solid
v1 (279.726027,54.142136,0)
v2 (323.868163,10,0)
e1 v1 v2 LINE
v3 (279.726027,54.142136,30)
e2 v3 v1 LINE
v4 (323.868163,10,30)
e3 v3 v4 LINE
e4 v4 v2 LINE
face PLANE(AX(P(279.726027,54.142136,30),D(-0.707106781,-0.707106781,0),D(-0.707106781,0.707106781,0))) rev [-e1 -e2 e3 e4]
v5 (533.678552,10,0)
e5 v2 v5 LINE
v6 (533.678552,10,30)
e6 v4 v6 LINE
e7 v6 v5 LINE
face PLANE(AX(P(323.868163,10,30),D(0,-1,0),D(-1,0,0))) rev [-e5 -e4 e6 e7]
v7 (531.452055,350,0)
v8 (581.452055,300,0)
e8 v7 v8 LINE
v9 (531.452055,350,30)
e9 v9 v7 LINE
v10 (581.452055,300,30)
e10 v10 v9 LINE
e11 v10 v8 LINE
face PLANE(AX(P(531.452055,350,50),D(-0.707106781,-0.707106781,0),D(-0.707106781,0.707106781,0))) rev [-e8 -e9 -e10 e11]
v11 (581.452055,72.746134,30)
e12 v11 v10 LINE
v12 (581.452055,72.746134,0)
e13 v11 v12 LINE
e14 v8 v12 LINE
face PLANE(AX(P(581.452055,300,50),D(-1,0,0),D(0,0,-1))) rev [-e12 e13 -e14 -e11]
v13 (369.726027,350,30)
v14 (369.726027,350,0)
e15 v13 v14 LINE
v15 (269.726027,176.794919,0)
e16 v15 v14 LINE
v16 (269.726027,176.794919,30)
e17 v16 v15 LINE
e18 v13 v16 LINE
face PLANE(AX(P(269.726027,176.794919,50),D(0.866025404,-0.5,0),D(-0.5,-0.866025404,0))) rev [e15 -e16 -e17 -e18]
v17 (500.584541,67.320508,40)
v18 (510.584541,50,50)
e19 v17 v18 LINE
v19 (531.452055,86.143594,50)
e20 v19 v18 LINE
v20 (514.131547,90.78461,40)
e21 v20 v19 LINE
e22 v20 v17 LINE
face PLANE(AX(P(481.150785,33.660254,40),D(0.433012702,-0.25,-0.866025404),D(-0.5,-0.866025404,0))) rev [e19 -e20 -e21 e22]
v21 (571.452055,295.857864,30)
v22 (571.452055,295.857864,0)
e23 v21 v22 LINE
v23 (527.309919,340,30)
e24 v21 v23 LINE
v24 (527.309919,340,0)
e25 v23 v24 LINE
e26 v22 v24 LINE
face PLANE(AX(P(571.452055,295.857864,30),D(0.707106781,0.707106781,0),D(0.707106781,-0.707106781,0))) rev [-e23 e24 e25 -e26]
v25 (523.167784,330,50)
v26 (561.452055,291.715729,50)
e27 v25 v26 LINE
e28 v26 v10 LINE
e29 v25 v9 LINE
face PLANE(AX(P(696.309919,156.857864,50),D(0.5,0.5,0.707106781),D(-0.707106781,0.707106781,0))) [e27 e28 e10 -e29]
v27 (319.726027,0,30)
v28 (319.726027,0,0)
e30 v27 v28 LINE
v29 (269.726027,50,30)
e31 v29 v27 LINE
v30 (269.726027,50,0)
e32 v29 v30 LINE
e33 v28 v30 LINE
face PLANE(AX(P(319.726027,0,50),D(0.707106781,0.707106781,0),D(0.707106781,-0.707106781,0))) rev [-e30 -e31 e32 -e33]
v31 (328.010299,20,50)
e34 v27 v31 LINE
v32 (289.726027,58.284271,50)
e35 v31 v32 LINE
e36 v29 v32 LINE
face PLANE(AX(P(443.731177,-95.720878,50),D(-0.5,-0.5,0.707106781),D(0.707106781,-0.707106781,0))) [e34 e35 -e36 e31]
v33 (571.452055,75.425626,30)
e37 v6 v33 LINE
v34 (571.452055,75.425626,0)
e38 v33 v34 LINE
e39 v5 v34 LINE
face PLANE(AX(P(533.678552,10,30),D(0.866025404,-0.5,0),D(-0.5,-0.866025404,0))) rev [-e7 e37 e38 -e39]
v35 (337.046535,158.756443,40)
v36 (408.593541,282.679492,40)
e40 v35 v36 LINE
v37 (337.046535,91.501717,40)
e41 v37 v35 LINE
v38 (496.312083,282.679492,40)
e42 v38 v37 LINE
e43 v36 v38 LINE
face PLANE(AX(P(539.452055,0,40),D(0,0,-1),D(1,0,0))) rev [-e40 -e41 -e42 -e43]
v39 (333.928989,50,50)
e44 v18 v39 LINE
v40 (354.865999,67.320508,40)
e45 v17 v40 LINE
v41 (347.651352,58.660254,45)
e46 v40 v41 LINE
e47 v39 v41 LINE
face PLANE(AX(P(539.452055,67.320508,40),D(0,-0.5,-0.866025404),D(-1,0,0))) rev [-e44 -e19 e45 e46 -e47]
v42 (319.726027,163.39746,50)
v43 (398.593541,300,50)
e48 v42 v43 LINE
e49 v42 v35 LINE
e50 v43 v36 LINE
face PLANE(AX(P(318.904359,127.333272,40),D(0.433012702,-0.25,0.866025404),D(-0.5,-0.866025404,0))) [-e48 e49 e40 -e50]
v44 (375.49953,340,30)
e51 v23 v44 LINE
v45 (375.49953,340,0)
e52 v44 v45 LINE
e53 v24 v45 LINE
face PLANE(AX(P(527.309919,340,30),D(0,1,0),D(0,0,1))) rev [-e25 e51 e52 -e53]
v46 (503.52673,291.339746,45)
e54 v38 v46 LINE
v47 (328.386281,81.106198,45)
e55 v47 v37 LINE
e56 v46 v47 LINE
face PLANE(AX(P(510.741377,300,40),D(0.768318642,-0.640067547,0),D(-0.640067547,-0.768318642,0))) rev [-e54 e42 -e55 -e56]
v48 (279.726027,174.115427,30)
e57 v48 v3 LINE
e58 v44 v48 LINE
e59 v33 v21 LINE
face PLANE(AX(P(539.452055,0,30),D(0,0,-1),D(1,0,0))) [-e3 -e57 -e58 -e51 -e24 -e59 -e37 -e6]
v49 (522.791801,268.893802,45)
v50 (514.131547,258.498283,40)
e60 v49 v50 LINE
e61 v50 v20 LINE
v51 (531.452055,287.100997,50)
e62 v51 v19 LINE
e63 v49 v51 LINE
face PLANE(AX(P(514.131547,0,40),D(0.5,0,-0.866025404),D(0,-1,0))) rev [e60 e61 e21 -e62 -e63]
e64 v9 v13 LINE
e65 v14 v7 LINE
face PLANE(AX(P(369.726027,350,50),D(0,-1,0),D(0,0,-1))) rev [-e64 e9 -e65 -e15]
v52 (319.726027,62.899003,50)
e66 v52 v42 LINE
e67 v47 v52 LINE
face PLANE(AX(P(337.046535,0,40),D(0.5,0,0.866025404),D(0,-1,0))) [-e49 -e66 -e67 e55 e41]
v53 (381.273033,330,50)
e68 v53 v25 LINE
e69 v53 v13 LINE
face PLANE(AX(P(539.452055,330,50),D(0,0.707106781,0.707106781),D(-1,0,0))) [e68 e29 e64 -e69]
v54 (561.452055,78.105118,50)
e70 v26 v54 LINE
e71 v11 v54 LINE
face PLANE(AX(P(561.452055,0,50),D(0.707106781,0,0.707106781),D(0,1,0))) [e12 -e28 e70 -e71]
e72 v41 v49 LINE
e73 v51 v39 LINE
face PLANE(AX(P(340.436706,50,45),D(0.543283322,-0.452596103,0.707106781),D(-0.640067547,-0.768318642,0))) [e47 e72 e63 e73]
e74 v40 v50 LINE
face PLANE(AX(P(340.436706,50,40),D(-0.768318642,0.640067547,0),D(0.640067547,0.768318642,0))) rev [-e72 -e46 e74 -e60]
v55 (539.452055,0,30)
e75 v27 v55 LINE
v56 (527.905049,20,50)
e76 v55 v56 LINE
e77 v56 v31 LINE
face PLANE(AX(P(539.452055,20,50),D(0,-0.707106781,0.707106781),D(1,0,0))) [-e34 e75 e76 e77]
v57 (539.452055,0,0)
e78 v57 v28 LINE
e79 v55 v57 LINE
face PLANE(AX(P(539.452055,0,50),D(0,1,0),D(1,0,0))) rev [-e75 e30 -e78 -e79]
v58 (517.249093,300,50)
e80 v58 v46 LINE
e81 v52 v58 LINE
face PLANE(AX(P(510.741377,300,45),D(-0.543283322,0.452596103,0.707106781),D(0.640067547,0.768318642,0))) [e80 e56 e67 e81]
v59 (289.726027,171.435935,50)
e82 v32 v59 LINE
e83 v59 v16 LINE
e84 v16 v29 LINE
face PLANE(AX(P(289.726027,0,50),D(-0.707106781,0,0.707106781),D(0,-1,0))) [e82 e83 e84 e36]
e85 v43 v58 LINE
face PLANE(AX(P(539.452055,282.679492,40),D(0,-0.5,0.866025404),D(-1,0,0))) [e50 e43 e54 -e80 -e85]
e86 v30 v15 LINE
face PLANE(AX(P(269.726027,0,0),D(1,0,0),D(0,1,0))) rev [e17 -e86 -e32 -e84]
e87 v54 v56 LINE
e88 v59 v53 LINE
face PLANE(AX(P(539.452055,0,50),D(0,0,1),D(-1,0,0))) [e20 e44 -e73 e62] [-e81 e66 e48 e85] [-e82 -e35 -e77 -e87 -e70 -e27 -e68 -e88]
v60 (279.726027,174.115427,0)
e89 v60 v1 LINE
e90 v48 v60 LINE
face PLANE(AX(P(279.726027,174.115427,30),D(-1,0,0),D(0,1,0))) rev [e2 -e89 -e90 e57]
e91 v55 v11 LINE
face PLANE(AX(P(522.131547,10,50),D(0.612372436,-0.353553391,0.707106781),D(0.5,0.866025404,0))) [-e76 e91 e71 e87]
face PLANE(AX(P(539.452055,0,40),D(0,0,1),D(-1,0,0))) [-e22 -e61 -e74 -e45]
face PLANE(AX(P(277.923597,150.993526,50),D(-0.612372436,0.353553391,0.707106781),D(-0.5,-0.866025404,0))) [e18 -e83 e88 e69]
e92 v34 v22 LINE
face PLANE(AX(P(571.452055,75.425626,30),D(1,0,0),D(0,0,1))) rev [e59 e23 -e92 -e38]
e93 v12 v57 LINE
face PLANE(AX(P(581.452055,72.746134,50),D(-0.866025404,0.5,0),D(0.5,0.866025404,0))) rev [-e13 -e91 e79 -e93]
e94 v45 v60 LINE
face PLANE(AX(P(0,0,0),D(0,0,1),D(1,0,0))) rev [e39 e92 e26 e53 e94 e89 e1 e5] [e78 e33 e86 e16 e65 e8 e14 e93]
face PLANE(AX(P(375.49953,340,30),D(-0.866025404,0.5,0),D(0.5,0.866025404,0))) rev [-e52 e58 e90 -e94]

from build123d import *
from OCP.BRepFilletAPI import BRepFilletAPI_MakeChamfer

# Parameters (mm, degrees)
BOSS_EXTRU_1_DEPTH      = 50
CHANFREIN1_SIZE         = 20
ENL_V_MAT_EXTRU_1_DEPTH = 10
CHANFREIN2_SIZE         = 10
CHANFREIN2_SIZE_2       = 17.320508076
CHANFREIN3_SIZE         = 5
ENL_V_MAT_EXTRU_2_DEPTH = 30
ESQUISSE4_W             = 311.726027397
ESQUISSE4_H             = 51.931996983
ENL_V_MAT_EXTRU_3_DEPTH = 681.504586336


# Some blends are built 0.0001 mm under size
with BuildPart() as part:
    # Esquisse1 → Boss.-Extru.1 (new body)
    with BuildSketch(Plane.XY):
        Polygon((0, 0), (219.726027397, 0), (269.726027397, 50), (269.726027397, 176.794919243), (169.726027397, 350), (8, 350), (-42, 300), (-42, 72.746133918), align=None)
    extrude(amount=BOSS_EXTRU_1_DEPTH)

    # Chanfrein1
    chanfrein1_edges = [part.edges().sort_by_distance(p)[0] for p in [
        (244.726027397, 25, 50),
        (269.726027397, 113.397459622, 50),
        (219.726027397, 263.397459622, 50),
        (88.863013699, 350, 50),
        (-17, 325, 50),
        (-42, 186.373066959, 50),
        (-21, 36.373066959, 50),
        (109.863013699, 0, 50),
    ]]
    chamfer(chanfrein1_edges, length=CHANFREIN1_SIZE)

    # Esquisse2 → Enlèv. mat.-Extru.1 (cut)
    with BuildSketch(Plane.XY.offset(50)):
        Polygon((28.710678119, 300), (219.726027397, 70.710678119), (219.726027397, 163.397459622), (140.858513938, 300), align=None)
        Polygon((199.015349279, 50), (8, 279.289321881), (8, 86.143593539), (28.867513459, 50), align=None)
    extrude(amount=-ENL_V_MAT_EXTRU_1_DEPTH, mode=Mode.SUBTRACT)

    # Chanfrein2
    chanfrein2_edges_1 = [part.edges().sort_by_distance(p)[0] for p in [
        (219.726027397, 117.05406887, 40),
    ]]
    chanfrein2_side_1 = [part.faces().sort_by_distance(p)[0] for p in [
        (219.726027397, 117.05406887, 40.2),
    ]]
    chanfrein2_edges_2 = [part.edges().sort_by_distance(p)[0] for p in [
        (180.292270668, 231.698729811, 40),
    ]]
    chanfrein2_side_2 = [part.faces().sort_by_distance(p)[0] for p in [
        (180.292270668, 231.698729811, 40.2),
    ]]
    chanfrein2_edges_3 = [part.edges().sort_by_distance(p)[0] for p in [
        (84.784596028, 300, 40),
    ]]
    chanfrein2_side_3 = [part.faces().sort_by_distance(p)[0] for p in [
        (84.784596028, 300, 40.2),
    ]]
    chanfrein2_edges_4 = [part.edges().sort_by_distance(p)[0] for p in [
        (113.941431369, 50, 40),
    ]]
    chanfrein2_side_4 = [part.faces().sort_by_distance(p)[0] for p in [
        (113.941431369, 50, 40.2),
    ]]
    chanfrein2_edges_5 = [part.edges().sort_by_distance(p)[0] for p in [
        (18.43375673, 68.07179677, 40),
    ]]
    chanfrein2_side_5 = [part.faces().sort_by_distance(p)[0] for p in [
        (18.43375673, 68.07179677, 40.2),
    ]]
    chanfrein2_edges_6 = [part.edges().sort_by_distance(p)[0] for p in [
        (8, 182.71645771, 40),
    ]]
    chanfrein2_side_6 = [part.faces().sort_by_distance(p)[0] for p in [
        (8, 182.71645771, 40.2),
    ]]
    chanfrein2 = BRepFilletAPI_MakeChamfer(part.part.solid().wrapped)
    for e in chanfrein2_edges_1:
        chanfrein2.Add(CHANFREIN2_SIZE - 0.0001, CHANFREIN2_SIZE_2 - 0.0001, e.wrapped, chanfrein2_side_1[0].wrapped)
    for e in chanfrein2_edges_2:
        chanfrein2.Add(CHANFREIN2_SIZE - 0.0001, CHANFREIN2_SIZE_2 - 0.0001, e.wrapped, chanfrein2_side_2[0].wrapped)
    for e in chanfrein2_edges_3:
        chanfrein2.Add(CHANFREIN2_SIZE - 0.0001, CHANFREIN2_SIZE_2 - 0.0001, e.wrapped, chanfrein2_side_3[0].wrapped)
    for e in chanfrein2_edges_4:
        chanfrein2.Add(CHANFREIN2_SIZE - 0.0001, CHANFREIN2_SIZE_2 - 0.0001, e.wrapped, chanfrein2_side_4[0].wrapped)
    for e in chanfrein2_edges_5:
        chanfrein2.Add(CHANFREIN2_SIZE - 0.0001, CHANFREIN2_SIZE_2 - 0.0001, e.wrapped, chanfrein2_side_5[0].wrapped)
    for e in chanfrein2_edges_6:
        chanfrein2.Add(CHANFREIN2_SIZE - 0.0001, CHANFREIN2_SIZE_2 - 0.0001, e.wrapped, chanfrein2_side_6[0].wrapped)
    add(Compound.cast(chanfrein2.Shape()), mode=Mode.REPLACE)  # a hair under: the kernel refuses the full size

    # Chanfrein3
    # the kernel refuses this chamfer: 5 mm, written as the material it takes off along each edge
    with BuildSketch(Plane(origin=(20.480424013, 309.879359904, 50), x_dir=(-0.768028153682994, -0.6398255480361086, 0.02749587661058626), z_dir=(0.6400675467511631, -0.7683186419682577, 0))) as chanfrein3_piece_1_section:
        Polygon((CHANFREIN3_SIZE * 0.999621916911, CHANFREIN3_SIZE * 0.0274958766106), (-CHANFREIN3_SIZE * 0.0274958766106, CHANFREIN3_SIZE * 0.999621916911), (0, 0), align=None)
    chanfrein3_piece_1 = extrude(amount=324.14681629, mode=Mode.PRIVATE)
    chanfrein3_piece_1 = split(chanfrein3_piece_1, bisect_by=Plane(origin=(122.894695162, 300, 48.383637618), z_dir=(0, -1, 0)), keep=Keep.TOP, mode=Mode.PRIVATE)
    chanfrein3_piece_1 = split(chanfrein3_piece_1, bisect_by=Plane(origin=(122.894695162, 212.546373523, -0.491261384), z_dir=(0, -0.4999984150451088, 0.8660263188566379)), keep=Keep.TOP, mode=Mode.PRIVATE)
    chanfrein3_piece_1 = split(chanfrein3_piece_1, bisect_by=Plane(origin=(219.726027397, 184.328556692, 48.383637618), z_dir=(-1, 0, 0)), keep=Keep.TOP, mode=Mode.PRIVATE)
    chanfrein3_piece_1 = split(chanfrein3_piece_1, bisect_by=Plane(origin=(146.402514085, 184.328556692, 7.666728775), z_dir=(-0.49999841504510817, 0, 0.8660263188566384)), keep=Keep.TOP, mode=Mode.PRIVATE)
    add(chanfrein3_piece_1, mode=Mode.SUBTRACT)
    with BuildSketch(Plane(origin=(207.245603384, 40.120640096, 50), x_dir=(-0.02112559457717319, -0.017599218287911274, -0.9996219169112968), z_dir=(-0.6400675467511632, 0.7683186419682577, 0))) as chanfrein3_piece_2_section:
        Polygon((CHANFREIN3_SIZE * 0.999621916911, -CHANFREIN3_SIZE * 0.0274958766106), (-CHANFREIN3_SIZE * 0.0274958766106, -CHANFREIN3_SIZE * 0.999621916911), (0, 0), align=None)
    chanfrein3_piece_2 = extrude(amount=324.14681629, mode=Mode.PRIVATE)
    chanfrein3_piece_2 = split(chanfrein3_piece_2, bisect_by=Plane(origin=(104.831332235, 50, 48.383637618), z_dir=(0, 1, 0)), keep=Keep.TOP, mode=Mode.PRIVATE)
    chanfrein3_piece_2 = split(chanfrein3_piece_2, bisect_by=Plane(origin=(104.831332235, 137.453626477, -0.491261384), z_dir=(0, 0.4999984150451082, 0.8660263188566383)), keep=Keep.TOP, mode=Mode.PRIVATE)
    chanfrein3_piece_2 = split(chanfrein3_piece_2, bisect_by=Plane(origin=(8, 165.671443308, 48.383637618), z_dir=(1, 0, 0)), keep=Keep.TOP, mode=Mode.PRIVATE)
    chanfrein3_piece_2 = split(chanfrein3_piece_2, bisect_by=Plane(origin=(81.323513312, 165.671443308, 7.666728775), z_dir=(0.49999841504510834, 0, 0.8660263188566383)), keep=Keep.TOP, mode=Mode.PRIVATE)
    add(chanfrein3_piece_2, mode=Mode.SUBTRACT)

    # Esquisse3 → Enlèv. mat.-Extru.2 (cut)
    with BuildSketch(Plane(origin=(0, 0, 0), x_dir=(-1, 0, 0), z_dir=(0, 0, -1))):
        Polygon((-5.773502692, 10), (32, 75.425625842), (32, 295.857864376), (-12.142135624, 340), (-163.952524705, 340), (-259.726027397, 174.115427319), (-259.726027397, 54.142135624), (-215.583891774, 10), align=None)
    extrude(amount=-ENL_V_MAT_EXTRU_2_DEPTH, mode=Mode.SUBTRACT)

    # Symétrie1: part across plane


with BuildPart() as part_1:
    add(part.part)
    add(part.part.mirror(Plane(origin=(269.726027397, 50, 50), x_dir=(0, 0, 1), z_dir=(-1, 0, 0))))

    # Esquisse4 → Enlèv. mat.-Extru.3 (cut, through all)
    with BuildSketch(Plane(origin=(0, 350, 0), x_dir=(1, 0, 0), z_dir=(0, 1, 0))):
        with Locations((113.863013698, -25.965998492)):
            Rectangle(ESQUISSE4_W, ESQUISSE4_H)
    extrude(amount=-ENL_V_MAT_EXTRU_3_DEPTH, mode=Mode.SUBTRACT)


solid = part_1.part
